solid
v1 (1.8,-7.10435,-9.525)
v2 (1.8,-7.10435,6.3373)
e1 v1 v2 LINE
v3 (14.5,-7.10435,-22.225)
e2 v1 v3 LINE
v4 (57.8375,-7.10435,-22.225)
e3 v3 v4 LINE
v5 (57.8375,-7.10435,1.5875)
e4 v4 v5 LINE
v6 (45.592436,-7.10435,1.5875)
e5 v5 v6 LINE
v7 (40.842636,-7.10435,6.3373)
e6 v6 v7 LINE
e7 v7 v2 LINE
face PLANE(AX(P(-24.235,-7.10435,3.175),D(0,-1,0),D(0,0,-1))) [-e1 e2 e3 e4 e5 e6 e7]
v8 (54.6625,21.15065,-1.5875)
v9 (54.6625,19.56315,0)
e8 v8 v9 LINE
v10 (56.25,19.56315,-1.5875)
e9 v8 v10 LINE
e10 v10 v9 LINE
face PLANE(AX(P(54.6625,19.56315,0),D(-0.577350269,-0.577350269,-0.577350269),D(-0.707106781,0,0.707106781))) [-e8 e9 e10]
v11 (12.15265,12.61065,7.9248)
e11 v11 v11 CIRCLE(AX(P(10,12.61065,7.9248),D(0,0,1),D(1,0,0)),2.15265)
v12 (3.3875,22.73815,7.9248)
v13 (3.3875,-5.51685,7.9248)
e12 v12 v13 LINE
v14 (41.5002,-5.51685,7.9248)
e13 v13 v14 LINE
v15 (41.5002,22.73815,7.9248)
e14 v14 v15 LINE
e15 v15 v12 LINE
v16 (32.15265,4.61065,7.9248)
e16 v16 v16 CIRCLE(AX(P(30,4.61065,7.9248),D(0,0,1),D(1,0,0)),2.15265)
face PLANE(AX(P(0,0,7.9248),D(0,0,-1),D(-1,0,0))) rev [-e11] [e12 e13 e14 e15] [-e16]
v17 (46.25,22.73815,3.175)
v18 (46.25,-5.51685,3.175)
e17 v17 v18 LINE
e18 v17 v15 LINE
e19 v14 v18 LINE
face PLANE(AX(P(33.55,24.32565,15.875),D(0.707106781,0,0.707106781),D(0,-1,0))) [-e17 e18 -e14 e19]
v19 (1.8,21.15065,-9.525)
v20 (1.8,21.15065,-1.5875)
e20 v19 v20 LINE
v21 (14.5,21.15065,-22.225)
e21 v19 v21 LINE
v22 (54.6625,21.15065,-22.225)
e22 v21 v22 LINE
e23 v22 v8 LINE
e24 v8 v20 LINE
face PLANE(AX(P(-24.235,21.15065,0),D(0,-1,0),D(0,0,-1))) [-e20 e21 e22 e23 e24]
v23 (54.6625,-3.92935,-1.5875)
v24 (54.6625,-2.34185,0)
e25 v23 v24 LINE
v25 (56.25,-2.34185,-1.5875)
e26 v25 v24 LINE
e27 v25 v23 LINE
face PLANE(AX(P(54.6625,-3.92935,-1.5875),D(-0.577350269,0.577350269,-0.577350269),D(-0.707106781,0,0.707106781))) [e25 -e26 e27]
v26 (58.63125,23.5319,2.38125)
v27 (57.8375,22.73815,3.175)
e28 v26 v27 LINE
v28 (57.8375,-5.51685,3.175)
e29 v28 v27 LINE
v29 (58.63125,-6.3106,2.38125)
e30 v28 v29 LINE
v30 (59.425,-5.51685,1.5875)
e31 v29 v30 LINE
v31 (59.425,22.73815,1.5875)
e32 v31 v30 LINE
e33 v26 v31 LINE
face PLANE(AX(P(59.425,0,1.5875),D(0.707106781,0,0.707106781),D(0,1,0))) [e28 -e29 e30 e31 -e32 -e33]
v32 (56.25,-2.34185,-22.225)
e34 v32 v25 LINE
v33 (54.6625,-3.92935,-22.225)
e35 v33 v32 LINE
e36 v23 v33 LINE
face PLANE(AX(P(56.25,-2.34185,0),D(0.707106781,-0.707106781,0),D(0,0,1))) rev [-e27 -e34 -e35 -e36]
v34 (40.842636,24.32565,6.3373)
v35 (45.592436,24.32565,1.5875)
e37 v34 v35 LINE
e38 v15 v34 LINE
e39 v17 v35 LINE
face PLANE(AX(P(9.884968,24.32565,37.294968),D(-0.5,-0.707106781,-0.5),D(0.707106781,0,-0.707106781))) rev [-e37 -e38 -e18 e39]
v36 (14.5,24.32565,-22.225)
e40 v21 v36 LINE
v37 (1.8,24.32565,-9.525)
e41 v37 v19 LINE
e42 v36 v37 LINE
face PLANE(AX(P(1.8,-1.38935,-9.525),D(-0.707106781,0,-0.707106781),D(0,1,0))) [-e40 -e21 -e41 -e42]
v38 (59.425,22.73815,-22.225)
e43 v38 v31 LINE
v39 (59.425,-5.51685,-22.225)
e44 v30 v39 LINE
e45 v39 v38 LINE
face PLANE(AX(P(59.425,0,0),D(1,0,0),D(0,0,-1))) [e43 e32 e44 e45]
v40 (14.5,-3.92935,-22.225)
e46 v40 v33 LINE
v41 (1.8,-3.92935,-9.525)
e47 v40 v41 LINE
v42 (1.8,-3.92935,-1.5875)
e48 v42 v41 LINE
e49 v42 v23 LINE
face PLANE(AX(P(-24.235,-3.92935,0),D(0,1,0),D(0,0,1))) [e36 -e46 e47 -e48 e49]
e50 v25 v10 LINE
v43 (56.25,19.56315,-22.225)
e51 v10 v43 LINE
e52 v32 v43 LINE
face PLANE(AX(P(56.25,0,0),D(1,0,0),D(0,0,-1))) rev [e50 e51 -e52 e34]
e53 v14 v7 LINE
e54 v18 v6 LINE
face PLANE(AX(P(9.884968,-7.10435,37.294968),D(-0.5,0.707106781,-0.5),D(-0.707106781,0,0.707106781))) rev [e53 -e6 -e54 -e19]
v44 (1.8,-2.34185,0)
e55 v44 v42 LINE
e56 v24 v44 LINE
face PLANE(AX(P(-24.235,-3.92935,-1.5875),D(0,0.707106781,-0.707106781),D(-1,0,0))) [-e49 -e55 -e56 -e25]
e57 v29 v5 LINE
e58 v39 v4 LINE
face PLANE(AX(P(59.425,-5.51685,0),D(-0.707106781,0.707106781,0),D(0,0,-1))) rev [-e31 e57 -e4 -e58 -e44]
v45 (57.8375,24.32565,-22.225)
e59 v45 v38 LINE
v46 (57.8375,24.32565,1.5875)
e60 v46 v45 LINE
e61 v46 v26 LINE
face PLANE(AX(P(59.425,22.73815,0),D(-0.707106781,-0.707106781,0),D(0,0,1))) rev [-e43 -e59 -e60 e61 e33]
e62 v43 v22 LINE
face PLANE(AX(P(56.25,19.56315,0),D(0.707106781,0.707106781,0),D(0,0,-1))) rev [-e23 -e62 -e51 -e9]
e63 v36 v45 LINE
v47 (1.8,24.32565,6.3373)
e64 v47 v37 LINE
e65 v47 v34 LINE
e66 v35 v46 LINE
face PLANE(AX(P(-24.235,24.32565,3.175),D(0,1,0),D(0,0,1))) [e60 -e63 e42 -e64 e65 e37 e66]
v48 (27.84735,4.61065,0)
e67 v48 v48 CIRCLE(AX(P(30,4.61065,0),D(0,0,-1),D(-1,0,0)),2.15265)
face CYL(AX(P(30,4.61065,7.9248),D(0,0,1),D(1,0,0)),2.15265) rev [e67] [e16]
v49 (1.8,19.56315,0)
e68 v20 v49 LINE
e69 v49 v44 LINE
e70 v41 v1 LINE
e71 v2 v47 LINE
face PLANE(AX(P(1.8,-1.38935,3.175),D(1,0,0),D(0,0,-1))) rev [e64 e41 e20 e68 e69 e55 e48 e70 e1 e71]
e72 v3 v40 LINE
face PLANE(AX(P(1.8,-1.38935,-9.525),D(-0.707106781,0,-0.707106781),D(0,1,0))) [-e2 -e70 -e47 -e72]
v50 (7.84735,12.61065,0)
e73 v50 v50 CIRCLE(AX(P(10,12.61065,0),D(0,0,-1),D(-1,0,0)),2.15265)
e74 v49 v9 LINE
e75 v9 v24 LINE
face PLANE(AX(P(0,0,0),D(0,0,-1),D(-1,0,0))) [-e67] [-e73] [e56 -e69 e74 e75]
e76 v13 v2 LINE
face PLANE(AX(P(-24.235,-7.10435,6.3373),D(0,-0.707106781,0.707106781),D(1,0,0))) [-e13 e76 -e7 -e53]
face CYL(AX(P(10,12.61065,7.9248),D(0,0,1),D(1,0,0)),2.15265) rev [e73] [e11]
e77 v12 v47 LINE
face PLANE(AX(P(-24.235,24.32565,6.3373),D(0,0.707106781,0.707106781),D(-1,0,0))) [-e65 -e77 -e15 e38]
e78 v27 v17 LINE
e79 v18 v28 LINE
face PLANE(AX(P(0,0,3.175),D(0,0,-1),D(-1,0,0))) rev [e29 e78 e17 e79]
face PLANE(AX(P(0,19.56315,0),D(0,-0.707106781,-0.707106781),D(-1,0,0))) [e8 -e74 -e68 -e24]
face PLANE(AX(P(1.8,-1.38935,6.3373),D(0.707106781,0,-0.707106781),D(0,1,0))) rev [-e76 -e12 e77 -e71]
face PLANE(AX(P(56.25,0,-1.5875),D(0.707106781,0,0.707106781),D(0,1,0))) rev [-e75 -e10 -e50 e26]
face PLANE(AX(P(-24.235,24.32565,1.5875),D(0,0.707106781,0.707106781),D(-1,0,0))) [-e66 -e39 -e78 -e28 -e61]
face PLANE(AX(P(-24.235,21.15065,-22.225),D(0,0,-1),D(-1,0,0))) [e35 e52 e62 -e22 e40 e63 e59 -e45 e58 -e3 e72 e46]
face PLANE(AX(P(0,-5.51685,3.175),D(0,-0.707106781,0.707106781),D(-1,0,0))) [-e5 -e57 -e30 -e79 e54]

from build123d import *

# Parameters (mm, degrees)
SKETCH1_W             = 54.45
SKETCH1_H             = 20
BOSS_EXTRUDE1_DEPTH   = 3.175
BOSS_EXTRUDE2_DEPTH   = 54.45
SKETCH3_W             = 25.4
SKETCH3_H             = 31.43
BOSS_EXTRUDE3_DEPTH   = 3.175
CHAMFER1_SIZE         = 1.5875
CHAMFER2_SIZE         = 12.7
SKETCH5_W             = 31.75
SKETCH5_H             = 31.43
BOSS_EXTRUDE5_DEPTH   = 4.7498
CHAMFER3_SIZE         = 12.7
CHAMFER4_SIZE         = 1.5875
F_6_CLEARANCE_HOLE1_D = 4.3053


with BuildPart() as part:
    # Sketch1 → Boss-Extrude1 (new body)
    with BuildSketch(Plane.XY):
        with Locations((29.025, 8.610649597)):
            Rectangle(SKETCH1_W, SKETCH1_H)
    extrude(amount=BOSS_EXTRUDE1_DEPTH)

    # Sketch2 → Boss-Extrude2 (add)
    with BuildSketch(Plane(origin=(56.25, 0, 0), x_dir=(0, 0, -1), z_dir=(1, 0, 0))):
        Polygon((0, 18.610649597), (0, 21.150649597), (22.225, 21.150649597), (22.225, 24.325649597), (-3.175, 24.325649597), (-3.175, 18.610649597), align=None)
        Polygon((22.225, -3.929350403), (22.225, -7.104350403), (-3.175, -7.104350403), (-3.175, -1.389350403), (0, -1.389350403), (0, -3.929350403), align=None)
    extrude(amount=-BOSS_EXTRUDE2_DEPTH)

    # Sketch3 → Boss-Extrude3 (add)
    with BuildSketch(Plane(origin=(56.25, 0, 0), x_dir=(0, 0, -1), z_dir=(1, 0, 0))):
        with Locations((9.525, 8.610649597)):
            Rectangle(SKETCH3_W, SKETCH3_H)
    extrude(amount=BOSS_EXTRUDE3_DEPTH)

    # Chamfer1
    chamfer1_edges = [part.edges().sort_by_distance(p)[0] for p in [
        (29.025, 21.150649597, 0),
        (56.25, 21.150649597, -11.1125),
        (29.025, -3.929350403, 0),
        (56.25, -3.929350403, -11.1125),
        (59.425, 8.610649597, 3.175),
        (59.425, -7.104350403, -9.525),
        (59.425, 24.325649597, -9.525),
        (56.25, 8.610649597, 0),
    ]]
    chamfer(chamfer1_edges, length=CHAMFER1_SIZE)

    # Chamfer2
    chamfer2_edges = [part.edges().sort_by_distance(p)[0] for p in [
        (1.8, 22.738149597, -22.225),
        (1.8, -5.516850403, -22.225),
    ]]
    chamfer(chamfer2_edges, length=CHAMFER2_SIZE)

    # Sketch5 → Boss-Extrude5 (add)
    with BuildSketch(Plane.XY.offset(3.175)):
        with Locations((17.675, 8.610649597)):
            Rectangle(SKETCH5_W, SKETCH5_H)
    extrude(amount=BOSS_EXTRUDE5_DEPTH)

    # Chamfer3
    # the kernel refuses this chamfer: 12.7 mm, written as the material it adds along each edge
    with BuildSketch(Plane(origin=(33.55, 24.325649597, 3.175), x_dir=(0.9996219169112966, 0, -0.02749587661058638), z_dir=(0, -1, 0))) as chamfer3_piece_1_section:
        Polygon((CHAMFER3_SIZE * 0.999621916911, CHAMFER3_SIZE * 0.0274958766106), (-CHAMFER3_SIZE * 0.0274958766106, CHAMFER3_SIZE * 0.999621916911), (0, 0), align=None)
    chamfer3_piece_1 = extrude(amount=31.43, mode=Mode.PRIVATE)
    chamfer3_piece_1 = split(chamfer3_piece_1, bisect_by=Plane(origin=(38.87834153, 8.610649597, 7.9248), z_dir=(0, 0, -1)), keep=Keep.TOP, mode=Mode.PRIVATE)
    add(chamfer3_piece_1)

    # Chamfer4
    chamfer4_edges = [part.edges().sort_by_distance(p)[0] for p in [
        (21.6501, 24.325649597, 7.9248),
        (21.6501, -7.104350403, 7.9248),
        (1.8, 8.610649597, 7.9248),
        (52.04375, -7.104350403, 3.175),
        (52.04375, 24.325649597, 3.175),
        (43.8751, 24.325649597, 5.5499),
        (43.8751, -7.104350403, 5.5499),
    ]]
    chamfer(chamfer4_edges, length=CHAMFER4_SIZE)

    # #6 Clearance Hole1 (through all)
    with Locations(Plane.XY.offset(7.9248)):
        with Locations((10, 12.610649597), (30, 4.610649597)):
            Hole(F_6_CLEARANCE_HOLE1_D / 2)


solid = part.part
